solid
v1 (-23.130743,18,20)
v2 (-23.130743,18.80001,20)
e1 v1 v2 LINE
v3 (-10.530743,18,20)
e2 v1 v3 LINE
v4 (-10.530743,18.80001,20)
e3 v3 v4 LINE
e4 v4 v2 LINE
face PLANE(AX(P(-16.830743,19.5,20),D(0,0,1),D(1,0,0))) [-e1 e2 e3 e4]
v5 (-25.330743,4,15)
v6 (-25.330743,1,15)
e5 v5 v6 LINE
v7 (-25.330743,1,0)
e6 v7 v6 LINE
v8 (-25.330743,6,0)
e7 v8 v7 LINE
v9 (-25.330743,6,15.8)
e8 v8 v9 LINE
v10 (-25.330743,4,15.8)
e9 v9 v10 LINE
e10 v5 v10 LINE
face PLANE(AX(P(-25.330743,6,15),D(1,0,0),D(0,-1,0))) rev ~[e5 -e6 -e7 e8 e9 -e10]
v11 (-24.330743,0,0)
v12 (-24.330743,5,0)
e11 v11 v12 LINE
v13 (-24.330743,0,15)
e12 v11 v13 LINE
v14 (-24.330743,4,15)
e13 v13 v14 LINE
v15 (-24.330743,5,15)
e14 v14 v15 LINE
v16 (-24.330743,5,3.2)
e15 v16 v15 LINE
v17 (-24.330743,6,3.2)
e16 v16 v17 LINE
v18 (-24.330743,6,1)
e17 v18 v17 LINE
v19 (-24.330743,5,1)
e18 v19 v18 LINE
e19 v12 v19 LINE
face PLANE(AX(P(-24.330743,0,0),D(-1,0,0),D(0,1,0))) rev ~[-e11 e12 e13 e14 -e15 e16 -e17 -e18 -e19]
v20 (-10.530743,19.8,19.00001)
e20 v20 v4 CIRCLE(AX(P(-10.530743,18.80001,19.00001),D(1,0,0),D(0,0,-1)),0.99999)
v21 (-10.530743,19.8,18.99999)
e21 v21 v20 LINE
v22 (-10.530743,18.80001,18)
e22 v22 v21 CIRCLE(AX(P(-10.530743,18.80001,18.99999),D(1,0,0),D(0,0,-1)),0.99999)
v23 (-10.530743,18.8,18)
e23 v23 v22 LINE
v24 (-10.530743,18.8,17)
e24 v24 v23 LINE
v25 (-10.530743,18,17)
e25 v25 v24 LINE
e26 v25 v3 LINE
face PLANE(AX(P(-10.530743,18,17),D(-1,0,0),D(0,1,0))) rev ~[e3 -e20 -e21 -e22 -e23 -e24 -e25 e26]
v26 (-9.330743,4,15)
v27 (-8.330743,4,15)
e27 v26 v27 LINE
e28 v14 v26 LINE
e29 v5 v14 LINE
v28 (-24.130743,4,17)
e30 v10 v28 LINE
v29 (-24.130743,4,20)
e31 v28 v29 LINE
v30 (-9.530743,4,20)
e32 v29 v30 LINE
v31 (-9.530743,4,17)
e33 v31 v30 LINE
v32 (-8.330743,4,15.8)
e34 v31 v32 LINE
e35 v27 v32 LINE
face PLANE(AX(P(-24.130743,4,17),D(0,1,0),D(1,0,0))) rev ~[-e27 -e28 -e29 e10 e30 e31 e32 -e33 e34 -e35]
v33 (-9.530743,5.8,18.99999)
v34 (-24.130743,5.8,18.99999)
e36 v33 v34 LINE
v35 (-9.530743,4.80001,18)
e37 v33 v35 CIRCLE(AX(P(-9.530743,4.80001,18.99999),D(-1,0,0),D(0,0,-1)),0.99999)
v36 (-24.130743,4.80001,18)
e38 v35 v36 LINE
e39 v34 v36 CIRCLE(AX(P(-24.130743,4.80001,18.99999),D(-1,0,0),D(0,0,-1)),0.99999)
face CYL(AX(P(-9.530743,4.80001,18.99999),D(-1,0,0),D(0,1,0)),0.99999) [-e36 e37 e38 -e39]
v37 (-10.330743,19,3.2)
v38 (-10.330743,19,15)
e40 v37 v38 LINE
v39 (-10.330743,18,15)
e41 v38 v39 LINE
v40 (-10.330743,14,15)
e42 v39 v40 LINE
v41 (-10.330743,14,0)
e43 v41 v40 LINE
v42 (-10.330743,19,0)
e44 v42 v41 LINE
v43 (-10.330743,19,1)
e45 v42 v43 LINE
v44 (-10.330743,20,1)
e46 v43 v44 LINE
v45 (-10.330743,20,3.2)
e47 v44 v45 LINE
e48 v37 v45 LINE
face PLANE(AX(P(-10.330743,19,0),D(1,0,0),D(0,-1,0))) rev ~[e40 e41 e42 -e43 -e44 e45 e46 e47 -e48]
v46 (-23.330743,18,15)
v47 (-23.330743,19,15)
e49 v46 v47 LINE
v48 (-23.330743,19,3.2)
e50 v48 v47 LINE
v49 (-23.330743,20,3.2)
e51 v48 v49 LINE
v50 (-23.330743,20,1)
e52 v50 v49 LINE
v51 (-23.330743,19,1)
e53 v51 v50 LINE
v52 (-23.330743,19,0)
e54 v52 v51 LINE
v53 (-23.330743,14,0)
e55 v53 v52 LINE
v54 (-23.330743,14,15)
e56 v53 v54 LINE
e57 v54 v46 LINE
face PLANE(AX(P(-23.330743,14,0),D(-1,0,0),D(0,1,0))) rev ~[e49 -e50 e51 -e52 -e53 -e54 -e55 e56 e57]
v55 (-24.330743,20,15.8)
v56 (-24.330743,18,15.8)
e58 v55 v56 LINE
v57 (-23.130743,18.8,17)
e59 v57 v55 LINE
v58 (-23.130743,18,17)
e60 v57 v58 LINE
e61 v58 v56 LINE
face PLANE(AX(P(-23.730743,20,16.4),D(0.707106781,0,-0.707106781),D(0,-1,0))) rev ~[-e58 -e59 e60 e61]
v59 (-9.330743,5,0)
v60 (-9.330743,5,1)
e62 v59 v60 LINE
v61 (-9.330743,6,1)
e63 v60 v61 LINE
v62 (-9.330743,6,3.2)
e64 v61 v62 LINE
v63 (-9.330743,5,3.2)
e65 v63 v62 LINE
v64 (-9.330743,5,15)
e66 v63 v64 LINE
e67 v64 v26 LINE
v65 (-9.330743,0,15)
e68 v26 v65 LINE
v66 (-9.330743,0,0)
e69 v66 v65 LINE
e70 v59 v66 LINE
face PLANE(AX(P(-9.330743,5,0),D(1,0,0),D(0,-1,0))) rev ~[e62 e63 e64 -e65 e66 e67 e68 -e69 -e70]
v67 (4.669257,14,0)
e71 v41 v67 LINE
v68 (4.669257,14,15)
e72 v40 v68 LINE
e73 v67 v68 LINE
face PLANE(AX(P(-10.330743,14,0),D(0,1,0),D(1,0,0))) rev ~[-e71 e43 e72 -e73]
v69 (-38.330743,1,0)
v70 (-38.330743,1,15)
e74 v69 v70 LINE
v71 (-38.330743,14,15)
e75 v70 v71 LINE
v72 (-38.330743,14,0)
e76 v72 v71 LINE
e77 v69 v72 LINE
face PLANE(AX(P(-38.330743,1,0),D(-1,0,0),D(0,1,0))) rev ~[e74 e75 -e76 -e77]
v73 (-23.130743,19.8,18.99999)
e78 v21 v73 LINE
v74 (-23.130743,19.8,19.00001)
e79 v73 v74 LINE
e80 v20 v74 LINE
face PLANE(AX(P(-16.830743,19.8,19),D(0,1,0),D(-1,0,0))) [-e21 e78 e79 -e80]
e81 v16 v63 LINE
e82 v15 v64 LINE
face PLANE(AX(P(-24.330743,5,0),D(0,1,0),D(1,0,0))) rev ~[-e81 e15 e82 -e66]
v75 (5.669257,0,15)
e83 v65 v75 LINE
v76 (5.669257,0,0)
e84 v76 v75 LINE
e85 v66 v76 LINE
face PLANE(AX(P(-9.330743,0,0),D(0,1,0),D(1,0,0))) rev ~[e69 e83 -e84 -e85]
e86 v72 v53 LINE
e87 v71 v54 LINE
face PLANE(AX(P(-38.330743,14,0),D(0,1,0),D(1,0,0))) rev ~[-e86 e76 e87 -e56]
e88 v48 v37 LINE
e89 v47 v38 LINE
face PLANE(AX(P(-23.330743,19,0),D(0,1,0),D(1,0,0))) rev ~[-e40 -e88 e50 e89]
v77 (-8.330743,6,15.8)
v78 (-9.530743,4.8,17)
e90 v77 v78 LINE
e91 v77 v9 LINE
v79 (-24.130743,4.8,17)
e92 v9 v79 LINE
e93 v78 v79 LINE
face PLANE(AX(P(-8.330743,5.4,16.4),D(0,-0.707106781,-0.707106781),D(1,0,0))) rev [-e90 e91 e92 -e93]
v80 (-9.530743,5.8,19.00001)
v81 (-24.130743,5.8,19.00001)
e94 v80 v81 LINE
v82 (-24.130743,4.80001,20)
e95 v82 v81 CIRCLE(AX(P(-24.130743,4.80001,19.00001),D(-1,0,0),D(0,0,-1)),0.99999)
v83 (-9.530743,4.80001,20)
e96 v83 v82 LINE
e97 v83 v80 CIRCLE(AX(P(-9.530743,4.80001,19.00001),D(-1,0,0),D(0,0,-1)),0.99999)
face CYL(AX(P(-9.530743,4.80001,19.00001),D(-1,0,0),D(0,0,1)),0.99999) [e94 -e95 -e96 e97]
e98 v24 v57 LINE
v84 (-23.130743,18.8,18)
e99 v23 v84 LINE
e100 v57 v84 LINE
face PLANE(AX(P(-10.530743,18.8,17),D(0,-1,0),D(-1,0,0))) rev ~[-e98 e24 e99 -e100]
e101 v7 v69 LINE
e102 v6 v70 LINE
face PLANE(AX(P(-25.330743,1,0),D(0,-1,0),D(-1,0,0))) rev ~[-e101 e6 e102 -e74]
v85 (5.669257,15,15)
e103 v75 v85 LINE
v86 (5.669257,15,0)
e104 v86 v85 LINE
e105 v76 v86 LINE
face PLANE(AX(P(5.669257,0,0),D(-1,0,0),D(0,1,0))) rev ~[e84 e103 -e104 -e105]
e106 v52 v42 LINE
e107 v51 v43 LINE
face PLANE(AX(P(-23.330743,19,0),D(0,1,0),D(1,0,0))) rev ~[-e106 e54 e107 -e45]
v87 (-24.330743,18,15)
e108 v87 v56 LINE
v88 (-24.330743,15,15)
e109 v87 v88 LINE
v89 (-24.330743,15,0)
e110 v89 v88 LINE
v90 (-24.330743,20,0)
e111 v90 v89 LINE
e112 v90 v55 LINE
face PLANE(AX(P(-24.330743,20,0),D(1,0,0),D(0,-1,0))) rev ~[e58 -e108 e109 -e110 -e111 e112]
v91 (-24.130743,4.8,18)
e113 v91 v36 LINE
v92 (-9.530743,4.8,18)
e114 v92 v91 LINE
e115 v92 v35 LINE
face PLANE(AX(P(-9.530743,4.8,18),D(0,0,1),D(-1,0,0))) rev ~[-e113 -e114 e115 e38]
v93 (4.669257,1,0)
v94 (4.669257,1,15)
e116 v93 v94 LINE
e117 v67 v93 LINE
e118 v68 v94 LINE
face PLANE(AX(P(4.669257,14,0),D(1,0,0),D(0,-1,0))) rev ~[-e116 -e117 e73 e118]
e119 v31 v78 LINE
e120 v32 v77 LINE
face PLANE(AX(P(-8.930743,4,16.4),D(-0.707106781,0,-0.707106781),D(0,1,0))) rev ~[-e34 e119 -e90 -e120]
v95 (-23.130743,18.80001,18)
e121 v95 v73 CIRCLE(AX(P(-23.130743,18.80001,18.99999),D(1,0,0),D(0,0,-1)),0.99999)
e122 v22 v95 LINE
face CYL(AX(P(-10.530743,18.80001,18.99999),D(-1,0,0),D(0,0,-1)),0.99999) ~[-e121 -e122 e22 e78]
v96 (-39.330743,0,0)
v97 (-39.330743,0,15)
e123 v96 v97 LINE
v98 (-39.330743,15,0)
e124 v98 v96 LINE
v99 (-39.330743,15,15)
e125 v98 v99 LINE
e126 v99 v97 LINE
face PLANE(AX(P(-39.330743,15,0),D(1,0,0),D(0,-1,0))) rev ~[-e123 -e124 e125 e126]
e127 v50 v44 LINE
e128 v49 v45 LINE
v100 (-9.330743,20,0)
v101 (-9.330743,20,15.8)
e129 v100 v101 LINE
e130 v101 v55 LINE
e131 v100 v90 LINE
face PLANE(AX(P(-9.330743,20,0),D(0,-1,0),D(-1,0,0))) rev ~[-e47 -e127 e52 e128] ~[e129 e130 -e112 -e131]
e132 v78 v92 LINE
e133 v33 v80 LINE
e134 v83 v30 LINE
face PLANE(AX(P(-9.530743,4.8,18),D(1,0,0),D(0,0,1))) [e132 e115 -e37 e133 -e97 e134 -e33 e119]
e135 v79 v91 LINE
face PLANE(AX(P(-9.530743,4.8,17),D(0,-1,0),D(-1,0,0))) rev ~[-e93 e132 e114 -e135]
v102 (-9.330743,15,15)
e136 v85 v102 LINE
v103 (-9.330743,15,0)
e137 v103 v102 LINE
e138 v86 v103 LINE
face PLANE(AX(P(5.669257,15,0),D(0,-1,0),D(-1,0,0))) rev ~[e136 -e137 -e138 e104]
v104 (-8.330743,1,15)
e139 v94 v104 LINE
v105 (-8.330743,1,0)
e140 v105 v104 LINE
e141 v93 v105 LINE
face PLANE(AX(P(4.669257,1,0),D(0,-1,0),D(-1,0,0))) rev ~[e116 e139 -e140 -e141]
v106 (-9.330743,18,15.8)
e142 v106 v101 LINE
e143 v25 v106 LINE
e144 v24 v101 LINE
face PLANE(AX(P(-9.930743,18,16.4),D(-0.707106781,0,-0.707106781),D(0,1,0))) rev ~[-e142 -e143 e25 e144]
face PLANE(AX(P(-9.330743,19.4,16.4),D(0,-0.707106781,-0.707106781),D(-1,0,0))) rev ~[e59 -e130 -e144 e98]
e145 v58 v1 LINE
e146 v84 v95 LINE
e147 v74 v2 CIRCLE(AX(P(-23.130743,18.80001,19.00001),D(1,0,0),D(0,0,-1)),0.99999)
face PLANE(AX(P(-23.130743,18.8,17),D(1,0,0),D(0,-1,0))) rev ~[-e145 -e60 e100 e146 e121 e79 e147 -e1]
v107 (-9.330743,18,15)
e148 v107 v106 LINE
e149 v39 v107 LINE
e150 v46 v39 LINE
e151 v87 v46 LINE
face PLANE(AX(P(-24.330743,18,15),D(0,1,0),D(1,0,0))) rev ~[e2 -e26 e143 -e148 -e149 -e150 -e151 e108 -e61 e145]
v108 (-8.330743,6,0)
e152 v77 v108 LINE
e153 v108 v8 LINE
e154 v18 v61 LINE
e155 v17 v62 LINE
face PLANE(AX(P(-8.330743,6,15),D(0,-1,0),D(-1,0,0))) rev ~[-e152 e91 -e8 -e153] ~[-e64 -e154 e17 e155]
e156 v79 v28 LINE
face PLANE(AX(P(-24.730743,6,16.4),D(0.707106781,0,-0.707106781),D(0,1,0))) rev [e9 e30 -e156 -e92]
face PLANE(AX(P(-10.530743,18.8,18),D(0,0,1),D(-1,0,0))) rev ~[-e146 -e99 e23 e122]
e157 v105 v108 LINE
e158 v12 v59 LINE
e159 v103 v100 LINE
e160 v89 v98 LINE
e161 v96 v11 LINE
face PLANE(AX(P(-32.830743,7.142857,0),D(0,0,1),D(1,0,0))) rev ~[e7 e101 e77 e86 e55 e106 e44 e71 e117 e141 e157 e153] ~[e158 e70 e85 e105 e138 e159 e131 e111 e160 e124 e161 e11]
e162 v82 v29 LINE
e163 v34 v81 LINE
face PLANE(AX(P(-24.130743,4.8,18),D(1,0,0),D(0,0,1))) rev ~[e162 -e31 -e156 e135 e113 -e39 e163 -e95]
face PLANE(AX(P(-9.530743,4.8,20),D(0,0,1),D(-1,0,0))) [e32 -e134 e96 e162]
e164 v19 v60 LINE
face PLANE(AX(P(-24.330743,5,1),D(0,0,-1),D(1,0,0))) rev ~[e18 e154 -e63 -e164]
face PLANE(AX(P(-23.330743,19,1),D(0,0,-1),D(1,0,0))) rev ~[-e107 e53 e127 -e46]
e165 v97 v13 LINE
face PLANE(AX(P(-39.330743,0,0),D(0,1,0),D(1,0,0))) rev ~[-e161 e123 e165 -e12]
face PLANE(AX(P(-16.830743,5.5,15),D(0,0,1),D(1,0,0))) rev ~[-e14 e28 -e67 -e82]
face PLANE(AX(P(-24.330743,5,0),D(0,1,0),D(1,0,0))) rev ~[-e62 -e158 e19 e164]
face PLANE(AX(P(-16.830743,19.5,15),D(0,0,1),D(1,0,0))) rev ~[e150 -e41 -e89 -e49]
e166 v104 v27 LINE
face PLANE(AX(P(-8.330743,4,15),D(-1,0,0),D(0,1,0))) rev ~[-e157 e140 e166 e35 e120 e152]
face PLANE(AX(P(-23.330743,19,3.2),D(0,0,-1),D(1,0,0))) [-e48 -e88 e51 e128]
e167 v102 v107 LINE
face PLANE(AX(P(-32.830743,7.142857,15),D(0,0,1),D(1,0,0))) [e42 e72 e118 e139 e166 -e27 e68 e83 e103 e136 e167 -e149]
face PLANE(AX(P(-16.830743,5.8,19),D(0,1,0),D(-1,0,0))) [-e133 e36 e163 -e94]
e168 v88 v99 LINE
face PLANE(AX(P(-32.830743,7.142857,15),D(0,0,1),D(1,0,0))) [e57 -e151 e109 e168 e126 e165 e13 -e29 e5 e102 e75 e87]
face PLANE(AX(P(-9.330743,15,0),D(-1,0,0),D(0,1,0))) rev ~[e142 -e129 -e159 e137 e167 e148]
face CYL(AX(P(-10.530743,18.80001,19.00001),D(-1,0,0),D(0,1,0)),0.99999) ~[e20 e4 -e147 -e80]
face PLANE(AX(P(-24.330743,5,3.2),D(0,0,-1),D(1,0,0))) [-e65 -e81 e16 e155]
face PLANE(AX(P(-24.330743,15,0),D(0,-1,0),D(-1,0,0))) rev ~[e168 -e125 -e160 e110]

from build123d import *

# Parameters (mm, degrees)
F3_DEPTH  = 15
F4_W      = 1
F4_H      = 1
F4_W_2    = 15
F4_W_3    = 13
F5_DEPTH  = 2
F6_SIZE   = 1.2
F7_DEPTH  = 3
F8_W      = 14.6
F8_H      = 2
F9_W      = 12.6
F9_H      = 2
F10_DEPTH = 1
F11_R     = 0.99999
F12_W     = 15
F12_H     = 2.2
F13_W     = 13
F13_H     = 2.2
F14_DEPTH = 1


# Not quite as in the source:
# - a fillet or chamfer is up to 0.001 mm smaller than in the source, because OpenCascade refuses the exact size


with BuildPart() as f3:
    # F2 (on Top) → F3 (new body)
    with BuildSketch(Plane.XY):
        Polygon((-39.3307432532, 0), (-24.3307432532, 0), (-24.3307432532, 5), (-24.3307432532, 6), (-25.3307432532, 6), (-25.3307432532, 1), (-38.3307432532, 1), (-38.3307432532, 14), (-25.3307432532, 14), (-24.3307432532, 14), (-24.3307432532, 15), (-39.3307432532, 15), align=None)
        Polygon((-24.3307432532, 6), (-24.3307432532, 5), (-9.3307432532, 5), (-9.3307432532, 6), (-10.3307432532, 6), (-23.3307432532, 6), align=None)
        Polygon((-9.3307432532, 6), (-9.3307432532, 5), (-9.3307432532, 0), (5.6692567468, 0), (5.6692567468, 15), (-9.3307432532, 15), (-9.3307432532, 14), (-8.3307432532, 14), (4.6692567468, 14), (4.6692567468, 1), (-8.3307432532, 1), (-8.3307432532, 6), align=None)
        Polygon((-24.3307432532, 20), (-24.3307432532, 15), (-24.3307432532, 14), (-23.3307432532, 14), (-23.3307432532, 19), (-10.3307432532, 19), (-10.3307432532, 14), (-9.3307432532, 14), (-9.3307432532, 15), (-9.3307432532, 20), align=None)
    extrude(amount=F3_DEPTH)

    # F4 (on face) → F5 (join)
    with BuildSketch(Plane.XY.offset(15)):
        Polygon((-8.3307432532, 6), (-25.3307432532, 6), (-25.3307432532, 5), (-24.3307432532, 5), (-9.3307432532, 5), (-8.3307432532, 5), align=None)
        with Locations((-8.8307432532, 4.5)):
            Rectangle(F4_W, F4_H)
        with Locations((-16.8307432532, 4.5)):
            Rectangle(F4_W_2, F4_H)
        with Locations((-24.8307432532, 4.5)):
            Rectangle(F4_W, F4_H)
        Polygon((-24.3307432532, 19), (-23.3307432532, 19), (-10.3307432532, 19), (-9.3307432532, 19), (-9.3307432532, 20), (-24.3307432532, 20), align=None)
        with Locations((-23.8307432532, 18.5)):
            Rectangle(F4_W, F4_H)
        with Locations((-16.8307432532, 18.5)):
            Rectangle(F4_W_3, F4_H)
        with Locations((-9.8307432532, 18.5)):
            Rectangle(F4_W, F4_H)
    extrude(amount=F5_DEPTH)

    # F6
    f6_edges = [f3.edges().sort_by_distance(p)[0] for p in [
        (-16.830743, 6, 17),
        (-25.330743, 5, 17),
        (-8.330743, 5, 17),
        (-16.830743, 20, 17),
        (-24.330743, 19, 17),
        (-9.330743, 19, 17),
    ]]
    chamfer(f6_edges, length=F6_SIZE)

    # F7 (add): faces of the model
    f7_faces = [f3.faces().sort_by_distance(p)[0] for p in [
        (-16.8307432532, 4.4, 17),
        (-16.8307432532, 18.4, 17),
    ]]
    extrude(f7_faces, amount=F7_DEPTH)

    # F8 (on face) + F9 (on face) → F10 (join)
    with BuildSketch(Plane(origin=(0, 4.8, 0), x_dir=(-1, 0, 0), z_dir=(0, 1, 0))):
        with Locations((16.8307432532, 19)):
            Rectangle(F8_W, F8_H)
    with BuildSketch(Plane(origin=(0, 18.8, 0), x_dir=(-1, 0, 0), z_dir=(0, 1, 0))):
        with Locations((16.8307432532, 19)):
            Rectangle(F9_W, F9_H)
    extrude(amount=F10_DEPTH)

    # F11 (radius 1 in the source; OpenCascade refuses exactly that, so slightly less here)
    f11_edges = [f3.edges().sort_by_distance(p)[0] for p in [
        (-16.830743, 5.8, 20),
        (-16.830743, 5.8, 18),
        (-16.830743, 19.8, 20),
        (-16.830743, 19.8, 18),
    ]]
    fillet(f11_edges, radius=F11_R)

    # F12 (on face) + F13 (on face) → F14 (cut, through all)
    with BuildSketch(Plane.XZ.offset(-5)):
        with Locations((-16.8307432532, 2.1)):
            Rectangle(F12_W, F12_H)
    with BuildSketch(Plane.XZ.offset(-19)):
        with Locations((-16.8307432532, 2.1)):
            Rectangle(F13_W, F13_H)
    extrude(amount=-F14_DEPTH, mode=Mode.SUBTRACT)


solid = f3.part
